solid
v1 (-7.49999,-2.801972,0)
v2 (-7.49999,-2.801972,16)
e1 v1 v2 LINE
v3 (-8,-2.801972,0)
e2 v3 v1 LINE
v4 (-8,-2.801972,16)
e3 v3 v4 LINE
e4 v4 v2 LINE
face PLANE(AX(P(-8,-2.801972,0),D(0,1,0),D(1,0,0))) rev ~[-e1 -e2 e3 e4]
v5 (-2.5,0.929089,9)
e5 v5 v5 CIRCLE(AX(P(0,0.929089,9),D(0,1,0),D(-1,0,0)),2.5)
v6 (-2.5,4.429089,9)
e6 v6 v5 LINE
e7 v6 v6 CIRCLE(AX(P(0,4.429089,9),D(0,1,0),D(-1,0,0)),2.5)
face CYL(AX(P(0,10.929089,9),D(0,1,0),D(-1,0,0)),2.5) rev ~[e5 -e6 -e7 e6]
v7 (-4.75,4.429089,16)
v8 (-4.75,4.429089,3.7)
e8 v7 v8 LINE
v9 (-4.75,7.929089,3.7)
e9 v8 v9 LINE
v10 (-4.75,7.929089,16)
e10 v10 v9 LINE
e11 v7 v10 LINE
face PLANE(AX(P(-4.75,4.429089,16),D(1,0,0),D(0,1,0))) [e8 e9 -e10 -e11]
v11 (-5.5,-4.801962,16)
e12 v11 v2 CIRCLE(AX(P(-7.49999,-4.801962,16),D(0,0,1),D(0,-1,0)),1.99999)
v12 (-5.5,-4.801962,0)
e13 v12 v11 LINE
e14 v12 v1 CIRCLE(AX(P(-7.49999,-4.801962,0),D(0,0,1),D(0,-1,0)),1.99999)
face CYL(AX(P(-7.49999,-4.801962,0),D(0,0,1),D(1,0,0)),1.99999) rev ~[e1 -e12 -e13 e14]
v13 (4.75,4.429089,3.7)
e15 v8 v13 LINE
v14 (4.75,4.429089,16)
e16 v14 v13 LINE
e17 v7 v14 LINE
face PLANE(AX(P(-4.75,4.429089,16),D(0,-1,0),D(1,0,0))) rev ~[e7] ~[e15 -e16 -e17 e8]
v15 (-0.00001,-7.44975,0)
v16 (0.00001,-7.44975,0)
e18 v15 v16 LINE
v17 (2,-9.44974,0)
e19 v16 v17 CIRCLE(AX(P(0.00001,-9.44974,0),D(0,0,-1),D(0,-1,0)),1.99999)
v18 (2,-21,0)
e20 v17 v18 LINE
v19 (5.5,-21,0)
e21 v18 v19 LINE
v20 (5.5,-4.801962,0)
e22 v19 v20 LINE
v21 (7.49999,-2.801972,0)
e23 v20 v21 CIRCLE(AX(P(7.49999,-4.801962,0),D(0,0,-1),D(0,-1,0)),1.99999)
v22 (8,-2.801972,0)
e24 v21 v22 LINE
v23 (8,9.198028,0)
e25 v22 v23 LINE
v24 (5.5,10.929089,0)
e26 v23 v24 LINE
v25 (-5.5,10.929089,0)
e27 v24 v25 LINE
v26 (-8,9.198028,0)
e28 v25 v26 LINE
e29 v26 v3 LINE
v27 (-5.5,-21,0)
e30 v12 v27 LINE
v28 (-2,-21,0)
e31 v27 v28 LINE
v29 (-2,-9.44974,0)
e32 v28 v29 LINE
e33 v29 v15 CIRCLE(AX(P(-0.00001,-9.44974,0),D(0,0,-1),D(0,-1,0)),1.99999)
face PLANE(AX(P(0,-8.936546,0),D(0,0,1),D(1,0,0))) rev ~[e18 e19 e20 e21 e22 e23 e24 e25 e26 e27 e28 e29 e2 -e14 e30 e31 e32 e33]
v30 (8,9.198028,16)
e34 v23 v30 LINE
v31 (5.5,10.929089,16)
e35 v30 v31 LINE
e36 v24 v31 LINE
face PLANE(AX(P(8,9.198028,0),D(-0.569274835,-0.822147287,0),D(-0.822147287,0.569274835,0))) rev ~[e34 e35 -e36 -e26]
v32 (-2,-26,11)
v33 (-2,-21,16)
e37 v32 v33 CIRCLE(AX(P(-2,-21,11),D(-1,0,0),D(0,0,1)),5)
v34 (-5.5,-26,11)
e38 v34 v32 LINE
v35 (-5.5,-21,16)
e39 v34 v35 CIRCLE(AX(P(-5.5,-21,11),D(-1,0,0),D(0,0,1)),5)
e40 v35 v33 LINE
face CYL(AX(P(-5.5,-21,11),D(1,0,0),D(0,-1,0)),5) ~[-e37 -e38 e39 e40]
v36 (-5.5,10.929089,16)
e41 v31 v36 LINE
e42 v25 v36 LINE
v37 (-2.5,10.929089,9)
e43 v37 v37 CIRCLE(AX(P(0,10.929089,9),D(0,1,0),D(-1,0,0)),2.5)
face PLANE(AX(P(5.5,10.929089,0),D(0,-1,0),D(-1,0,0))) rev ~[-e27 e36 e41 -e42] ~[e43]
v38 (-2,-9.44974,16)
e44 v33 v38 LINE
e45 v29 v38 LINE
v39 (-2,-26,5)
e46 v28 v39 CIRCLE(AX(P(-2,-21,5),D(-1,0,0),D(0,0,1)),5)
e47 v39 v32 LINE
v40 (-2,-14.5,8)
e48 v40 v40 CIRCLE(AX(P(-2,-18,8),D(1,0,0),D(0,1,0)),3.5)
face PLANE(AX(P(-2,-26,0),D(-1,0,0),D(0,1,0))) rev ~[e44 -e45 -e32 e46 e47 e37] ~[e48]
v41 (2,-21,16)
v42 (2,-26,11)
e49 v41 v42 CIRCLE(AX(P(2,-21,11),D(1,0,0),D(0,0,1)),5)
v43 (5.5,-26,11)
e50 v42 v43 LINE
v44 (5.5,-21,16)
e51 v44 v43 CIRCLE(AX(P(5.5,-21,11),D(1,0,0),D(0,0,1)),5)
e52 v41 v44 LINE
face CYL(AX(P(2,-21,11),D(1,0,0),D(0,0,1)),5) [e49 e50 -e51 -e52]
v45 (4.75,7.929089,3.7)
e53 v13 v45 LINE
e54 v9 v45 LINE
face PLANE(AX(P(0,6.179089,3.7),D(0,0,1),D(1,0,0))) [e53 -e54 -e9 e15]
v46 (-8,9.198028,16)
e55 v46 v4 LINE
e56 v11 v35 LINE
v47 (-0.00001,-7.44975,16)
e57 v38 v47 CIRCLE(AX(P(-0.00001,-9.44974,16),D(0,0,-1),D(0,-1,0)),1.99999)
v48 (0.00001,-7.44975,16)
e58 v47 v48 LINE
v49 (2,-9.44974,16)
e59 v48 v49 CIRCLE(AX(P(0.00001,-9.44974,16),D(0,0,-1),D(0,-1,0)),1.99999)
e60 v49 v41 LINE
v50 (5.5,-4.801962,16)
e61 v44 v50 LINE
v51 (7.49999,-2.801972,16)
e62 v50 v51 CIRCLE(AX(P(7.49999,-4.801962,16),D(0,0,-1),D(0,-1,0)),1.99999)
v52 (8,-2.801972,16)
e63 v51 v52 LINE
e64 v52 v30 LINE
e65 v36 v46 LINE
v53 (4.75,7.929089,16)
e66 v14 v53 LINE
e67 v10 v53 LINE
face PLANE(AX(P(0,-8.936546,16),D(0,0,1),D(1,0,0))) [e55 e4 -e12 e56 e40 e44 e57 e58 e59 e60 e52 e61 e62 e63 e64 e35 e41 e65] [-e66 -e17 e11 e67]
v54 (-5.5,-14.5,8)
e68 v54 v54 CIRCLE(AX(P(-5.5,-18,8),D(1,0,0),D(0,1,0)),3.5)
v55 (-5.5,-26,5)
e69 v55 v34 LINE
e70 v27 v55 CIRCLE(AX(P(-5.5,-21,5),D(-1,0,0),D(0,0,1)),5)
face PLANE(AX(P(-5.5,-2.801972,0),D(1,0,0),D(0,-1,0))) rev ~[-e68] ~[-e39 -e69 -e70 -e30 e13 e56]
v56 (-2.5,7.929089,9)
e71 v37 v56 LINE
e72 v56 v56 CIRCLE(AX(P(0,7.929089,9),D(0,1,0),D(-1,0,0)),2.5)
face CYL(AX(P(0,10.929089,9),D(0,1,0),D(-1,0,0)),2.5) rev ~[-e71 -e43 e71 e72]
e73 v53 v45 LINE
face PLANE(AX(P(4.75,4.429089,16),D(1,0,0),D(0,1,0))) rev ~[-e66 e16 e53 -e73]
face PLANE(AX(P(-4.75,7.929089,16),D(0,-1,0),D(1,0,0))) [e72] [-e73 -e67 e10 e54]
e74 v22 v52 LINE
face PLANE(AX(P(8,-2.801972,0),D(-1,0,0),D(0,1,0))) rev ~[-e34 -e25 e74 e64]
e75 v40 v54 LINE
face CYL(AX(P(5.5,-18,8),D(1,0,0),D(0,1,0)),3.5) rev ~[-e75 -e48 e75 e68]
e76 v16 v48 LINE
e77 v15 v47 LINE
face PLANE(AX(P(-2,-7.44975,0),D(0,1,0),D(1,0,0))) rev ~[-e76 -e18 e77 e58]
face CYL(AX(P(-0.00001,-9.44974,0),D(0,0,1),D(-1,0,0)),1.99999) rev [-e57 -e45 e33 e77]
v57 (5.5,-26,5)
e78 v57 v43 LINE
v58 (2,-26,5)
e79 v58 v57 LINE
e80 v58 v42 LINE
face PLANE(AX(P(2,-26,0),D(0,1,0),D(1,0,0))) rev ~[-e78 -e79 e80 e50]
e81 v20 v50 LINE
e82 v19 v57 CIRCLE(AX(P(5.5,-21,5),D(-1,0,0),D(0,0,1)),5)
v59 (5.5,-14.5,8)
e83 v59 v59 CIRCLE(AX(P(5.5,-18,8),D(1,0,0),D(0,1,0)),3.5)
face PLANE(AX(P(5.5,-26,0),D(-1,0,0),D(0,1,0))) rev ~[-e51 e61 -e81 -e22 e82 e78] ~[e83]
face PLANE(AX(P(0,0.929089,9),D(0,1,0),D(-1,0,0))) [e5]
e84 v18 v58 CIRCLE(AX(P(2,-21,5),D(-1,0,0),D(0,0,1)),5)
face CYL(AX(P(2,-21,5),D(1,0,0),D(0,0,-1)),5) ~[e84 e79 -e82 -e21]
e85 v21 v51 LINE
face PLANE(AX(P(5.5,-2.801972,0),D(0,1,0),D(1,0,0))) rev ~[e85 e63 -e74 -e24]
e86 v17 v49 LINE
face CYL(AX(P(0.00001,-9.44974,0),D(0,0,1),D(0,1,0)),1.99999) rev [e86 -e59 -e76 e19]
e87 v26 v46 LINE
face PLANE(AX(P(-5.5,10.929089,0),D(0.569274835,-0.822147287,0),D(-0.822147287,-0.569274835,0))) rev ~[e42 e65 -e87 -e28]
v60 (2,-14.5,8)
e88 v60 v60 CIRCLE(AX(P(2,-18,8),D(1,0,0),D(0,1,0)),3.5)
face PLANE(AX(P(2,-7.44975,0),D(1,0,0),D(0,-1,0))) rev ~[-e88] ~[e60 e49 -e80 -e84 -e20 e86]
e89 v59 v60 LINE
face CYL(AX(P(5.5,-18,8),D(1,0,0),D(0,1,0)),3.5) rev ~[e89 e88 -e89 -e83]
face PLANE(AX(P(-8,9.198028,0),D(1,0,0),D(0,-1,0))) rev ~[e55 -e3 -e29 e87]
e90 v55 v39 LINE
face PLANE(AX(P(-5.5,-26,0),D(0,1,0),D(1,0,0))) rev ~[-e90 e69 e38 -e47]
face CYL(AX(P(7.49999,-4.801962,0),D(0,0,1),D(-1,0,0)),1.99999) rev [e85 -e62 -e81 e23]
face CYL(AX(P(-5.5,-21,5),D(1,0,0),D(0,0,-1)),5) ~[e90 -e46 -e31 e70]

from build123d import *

# Parameters (mm, degrees)
F1_DEPTH = 16
F2_R     = 2.5
F3_DEPTH = 10
F4_R     = 3.5
F5_DEPTH = 11
F6_R     = 1.99999
F7_W     = 9.5
F7_H     = 3.5
F8_DEPTH = 12.3
F9_R     = 5


# Not quite as in the source:
# - a fillet or chamfer is up to 0.001 mm smaller than in the source, because OpenCascade refuses the exact size


with BuildPart() as f1:
    # F0 (on Top) → F1 (new body)
    with BuildSketch(Plane.XY):
        Polygon((-5.5, -2.8019716907), (-5.5, -26), (-2, -26), (-2, -7.4497503303), (2, -7.4497503303), (2, -26), (5.5, -26), (5.5, -2.8019716907), (8, -2.8019716907), (8, 9.1980283093), (5.5, 10.9290892892), (-5.5, 10.9290892892), (-8, 9.1980283093), (-8, -2.8019716907), align=None)
    extrude(amount=F1_DEPTH)

    # F2 (on face) → F3 (cut)
    with BuildSketch(Plane(origin=(0, 10.9290892892, 0), x_dir=(-1, 0, 0), z_dir=(0, 1, 0))):
        with Locations((0, 9)):
            Circle(F2_R)
    extrude(amount=-F3_DEPTH, mode=Mode.SUBTRACT)

    # F4 (on face) → F5 (cut, through all)
    with BuildSketch(Plane.YZ.offset(5.5)):
        with Locations((-18, 8)):
            Circle(F4_R)
    extrude(amount=-F5_DEPTH, mode=Mode.SUBTRACT)

    # F6 (radius 2 in the source; OpenCascade refuses exactly that, so slightly less here)
    f6_edges = [f1.edges().sort_by_distance(p)[0] for p in [
        (-5.5, -2.801972, 8),
        (2, -7.44975, 8),
        (-2, -7.44975, 8),
        (5.5, -2.801972, 8),
    ]]
    fillet(f6_edges, radius=F6_R)

    # F7 (on face) → F8 (cut)
    with BuildSketch(Plane.XY.offset(16)):
        with Locations((0, 6.1790892892)):
            Rectangle(F7_W, F7_H)
    extrude(amount=-F8_DEPTH, mode=Mode.SUBTRACT)

    # F9
    f9_edges = [f1.edges().sort_by_distance(p)[0] for p in [
        (3.75, -26, 16),
        (3.75, -26, 0),
        (-3.75, -26, 16),
        (-3.75, -26, 0),
    ]]
    fillet(f9_edges, radius=F9_R)


solid = f1.part
